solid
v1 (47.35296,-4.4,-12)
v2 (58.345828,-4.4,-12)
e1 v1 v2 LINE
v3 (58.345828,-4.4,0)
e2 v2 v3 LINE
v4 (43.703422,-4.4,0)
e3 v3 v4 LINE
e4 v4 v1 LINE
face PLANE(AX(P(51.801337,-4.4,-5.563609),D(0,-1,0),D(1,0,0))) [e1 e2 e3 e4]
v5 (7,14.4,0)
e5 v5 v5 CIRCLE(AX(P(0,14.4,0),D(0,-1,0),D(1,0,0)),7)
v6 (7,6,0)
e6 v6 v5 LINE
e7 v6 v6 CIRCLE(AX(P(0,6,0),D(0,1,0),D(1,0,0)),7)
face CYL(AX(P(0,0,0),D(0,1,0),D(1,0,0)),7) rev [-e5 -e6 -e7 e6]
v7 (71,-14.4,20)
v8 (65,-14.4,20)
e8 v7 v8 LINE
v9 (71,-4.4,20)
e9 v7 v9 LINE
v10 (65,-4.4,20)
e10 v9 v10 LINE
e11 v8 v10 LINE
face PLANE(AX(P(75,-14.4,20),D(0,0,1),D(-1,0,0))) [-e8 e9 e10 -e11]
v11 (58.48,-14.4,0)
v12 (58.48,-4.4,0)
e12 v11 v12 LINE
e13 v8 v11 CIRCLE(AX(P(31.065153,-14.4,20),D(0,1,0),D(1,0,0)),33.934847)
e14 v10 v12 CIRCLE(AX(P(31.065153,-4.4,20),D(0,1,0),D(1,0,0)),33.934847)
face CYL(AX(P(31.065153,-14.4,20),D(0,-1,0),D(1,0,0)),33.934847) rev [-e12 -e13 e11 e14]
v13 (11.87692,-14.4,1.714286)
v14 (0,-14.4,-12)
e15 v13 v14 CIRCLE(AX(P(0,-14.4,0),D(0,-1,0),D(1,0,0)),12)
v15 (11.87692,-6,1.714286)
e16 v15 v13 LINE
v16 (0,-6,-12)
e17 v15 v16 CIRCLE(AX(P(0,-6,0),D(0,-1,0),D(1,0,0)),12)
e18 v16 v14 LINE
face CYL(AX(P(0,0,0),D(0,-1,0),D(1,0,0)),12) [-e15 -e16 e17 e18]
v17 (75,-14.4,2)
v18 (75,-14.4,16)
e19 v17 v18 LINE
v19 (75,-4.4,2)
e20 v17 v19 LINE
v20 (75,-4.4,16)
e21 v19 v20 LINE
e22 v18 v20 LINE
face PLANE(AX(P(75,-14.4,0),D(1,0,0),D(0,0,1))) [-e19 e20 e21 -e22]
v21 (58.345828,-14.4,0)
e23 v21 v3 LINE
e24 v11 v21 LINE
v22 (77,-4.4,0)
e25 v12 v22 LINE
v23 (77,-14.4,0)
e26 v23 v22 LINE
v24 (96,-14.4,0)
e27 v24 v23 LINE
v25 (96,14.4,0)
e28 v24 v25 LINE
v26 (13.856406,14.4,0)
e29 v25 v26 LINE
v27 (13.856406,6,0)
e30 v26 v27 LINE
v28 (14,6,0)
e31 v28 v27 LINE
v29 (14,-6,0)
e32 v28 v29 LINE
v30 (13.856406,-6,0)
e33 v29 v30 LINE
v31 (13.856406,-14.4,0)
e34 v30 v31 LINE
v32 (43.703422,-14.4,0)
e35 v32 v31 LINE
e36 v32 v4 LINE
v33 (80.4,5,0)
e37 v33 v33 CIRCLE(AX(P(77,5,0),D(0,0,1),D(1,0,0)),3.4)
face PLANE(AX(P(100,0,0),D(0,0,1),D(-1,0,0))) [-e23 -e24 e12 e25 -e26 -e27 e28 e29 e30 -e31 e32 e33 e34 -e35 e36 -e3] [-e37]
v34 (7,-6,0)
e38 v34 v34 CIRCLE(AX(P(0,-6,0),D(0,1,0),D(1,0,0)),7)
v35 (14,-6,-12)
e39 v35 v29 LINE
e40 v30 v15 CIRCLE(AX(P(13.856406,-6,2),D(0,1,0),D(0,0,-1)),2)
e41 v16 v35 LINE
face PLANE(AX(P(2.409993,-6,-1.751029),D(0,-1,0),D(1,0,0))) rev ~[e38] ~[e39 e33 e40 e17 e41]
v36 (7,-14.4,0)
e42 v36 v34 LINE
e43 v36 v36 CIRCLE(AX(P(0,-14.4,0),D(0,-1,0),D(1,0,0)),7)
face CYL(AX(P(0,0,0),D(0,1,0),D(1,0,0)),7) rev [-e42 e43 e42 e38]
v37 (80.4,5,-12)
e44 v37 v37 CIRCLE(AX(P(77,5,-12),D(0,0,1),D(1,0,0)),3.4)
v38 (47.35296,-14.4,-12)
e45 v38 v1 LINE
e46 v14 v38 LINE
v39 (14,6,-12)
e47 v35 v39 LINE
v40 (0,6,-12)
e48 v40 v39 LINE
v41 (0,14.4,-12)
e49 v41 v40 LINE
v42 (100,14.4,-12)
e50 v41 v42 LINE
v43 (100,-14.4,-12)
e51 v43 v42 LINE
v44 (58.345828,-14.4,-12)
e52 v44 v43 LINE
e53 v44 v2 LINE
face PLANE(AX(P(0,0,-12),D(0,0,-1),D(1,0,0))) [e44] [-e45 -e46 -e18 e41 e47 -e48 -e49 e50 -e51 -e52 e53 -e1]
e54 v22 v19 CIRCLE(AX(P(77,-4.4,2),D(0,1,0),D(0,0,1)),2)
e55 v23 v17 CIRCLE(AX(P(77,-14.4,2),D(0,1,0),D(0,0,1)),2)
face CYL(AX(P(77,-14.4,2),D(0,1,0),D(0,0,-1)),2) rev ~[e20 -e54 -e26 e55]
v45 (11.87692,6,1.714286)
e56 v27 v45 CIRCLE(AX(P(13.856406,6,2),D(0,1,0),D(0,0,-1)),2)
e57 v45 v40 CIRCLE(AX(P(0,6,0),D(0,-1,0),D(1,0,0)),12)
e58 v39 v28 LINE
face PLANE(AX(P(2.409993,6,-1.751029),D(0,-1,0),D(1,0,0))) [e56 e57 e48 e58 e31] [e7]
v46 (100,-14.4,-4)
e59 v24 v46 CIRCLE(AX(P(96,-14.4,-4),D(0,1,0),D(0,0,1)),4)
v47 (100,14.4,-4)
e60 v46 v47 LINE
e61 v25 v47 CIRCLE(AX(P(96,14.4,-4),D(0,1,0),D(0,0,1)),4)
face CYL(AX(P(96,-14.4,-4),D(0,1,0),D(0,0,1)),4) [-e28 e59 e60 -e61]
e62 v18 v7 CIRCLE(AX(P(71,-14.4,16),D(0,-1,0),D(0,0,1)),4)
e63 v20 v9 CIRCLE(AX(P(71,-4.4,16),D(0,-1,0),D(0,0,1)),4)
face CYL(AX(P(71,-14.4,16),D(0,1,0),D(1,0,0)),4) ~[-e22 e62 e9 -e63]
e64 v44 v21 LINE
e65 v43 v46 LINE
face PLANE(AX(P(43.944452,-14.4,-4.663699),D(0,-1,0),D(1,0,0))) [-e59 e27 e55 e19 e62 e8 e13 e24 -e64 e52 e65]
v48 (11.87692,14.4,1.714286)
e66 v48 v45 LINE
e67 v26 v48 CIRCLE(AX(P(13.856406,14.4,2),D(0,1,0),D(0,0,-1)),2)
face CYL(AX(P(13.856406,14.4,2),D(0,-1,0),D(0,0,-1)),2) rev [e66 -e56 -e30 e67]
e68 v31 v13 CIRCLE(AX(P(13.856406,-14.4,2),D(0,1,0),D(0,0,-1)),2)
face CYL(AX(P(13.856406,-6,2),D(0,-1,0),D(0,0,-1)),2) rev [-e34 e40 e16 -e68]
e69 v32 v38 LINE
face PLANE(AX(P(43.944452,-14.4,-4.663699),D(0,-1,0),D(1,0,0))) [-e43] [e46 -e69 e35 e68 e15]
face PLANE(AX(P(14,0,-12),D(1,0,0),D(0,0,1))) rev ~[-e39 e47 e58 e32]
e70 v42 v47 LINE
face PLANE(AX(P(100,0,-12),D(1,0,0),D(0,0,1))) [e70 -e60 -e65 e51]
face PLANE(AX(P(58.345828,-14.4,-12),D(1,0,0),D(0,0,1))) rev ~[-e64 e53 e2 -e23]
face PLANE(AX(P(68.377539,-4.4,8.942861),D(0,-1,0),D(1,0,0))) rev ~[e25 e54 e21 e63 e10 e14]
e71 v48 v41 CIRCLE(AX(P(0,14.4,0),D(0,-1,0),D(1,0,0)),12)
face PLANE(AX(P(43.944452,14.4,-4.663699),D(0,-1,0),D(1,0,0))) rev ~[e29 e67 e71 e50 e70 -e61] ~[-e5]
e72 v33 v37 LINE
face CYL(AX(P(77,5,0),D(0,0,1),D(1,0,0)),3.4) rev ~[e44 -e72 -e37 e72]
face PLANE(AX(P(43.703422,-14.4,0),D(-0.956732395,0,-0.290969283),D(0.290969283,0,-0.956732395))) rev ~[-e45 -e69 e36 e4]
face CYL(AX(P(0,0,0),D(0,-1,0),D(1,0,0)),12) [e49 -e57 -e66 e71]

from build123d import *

# Parameters (mm, degrees)
F0_R      = 7
F1_DEPTH  = 14.4
F4_DEPTH  = 10
F7_DEPTH  = 10
F8_DEPTH  = 6
F9_R      = 3.4
F10_DEPTH = 25
F11_R     = 4
F12_R     = 2


with BuildPart() as f1:
    # F0 (on Front) → F1 (new body, symmetric)
    with BuildSketch(Plane.XZ):
        with BuildLine():
            Line((100, 0), (12, 0))
            ThreePointArc((12, 0), (-8.4852813742, 8.4852813742), (0, -12))
            Line((0, -12), (100, -12))
            Line((100, -12), (100, 0))
        make_face()
        Circle(F0_R, mode=Mode.SUBTRACT)
    extrude(amount=F1_DEPTH, both=True)

    # F3 (on face) → F4 (join)
    with BuildSketch(Plane.XZ.offset(14.4)):
        with BuildLine():
            Line((65, 0), (75, 0))
            Line((75, 0), (75, 20))
            Line((75, 20), (65, 20))
            ThreePointArc((65, 20), (63.3288514808, 9.4820344172), (58.48, 0))
            Line((58.48, 0), (65, 0))
        make_face()
    extrude(amount=-F4_DEPTH)

    # F6 (on face) → F7 (cut)
    with BuildSketch(Plane.XZ.offset(14.4)):
        Polygon((58.3458282053, -12), (58.3458282053, 0), (43.7034219503, 0), (47.3529601204, -12), align=None)
    extrude(amount=-F7_DEPTH, mode=Mode.SUBTRACT)

    # F2 (on Front) → F8 (cut, symmetric)
    with BuildSketch(Plane.XZ):
        with BuildLine():
            Line((14, -12), (14, 0))
            Line((14, 0), (12, 0))
            ThreePointArc((12, 0), (-8.4852813742, 8.4852813742), (0, -12))
            Line((0, -12), (14, -12))
        make_face()
    extrude(amount=F8_DEPTH, both=True, mode=Mode.SUBTRACT)

    # F9 (on face) → F10 (cut)
    with BuildSketch(Plane.XY):
        with Locations((77, 5)):
            Circle(F9_R)
    extrude(amount=-F10_DEPTH, mode=Mode.SUBTRACT)

    # F11
    f11_edges = [f1.edges().sort_by_distance(p)[0] for p in [
        (100, 0, 0),
        (75, -9.4, 20),
    ]]
    fillet(f11_edges, radius=F11_R)

    # F12
    f12_edges = [f1.edges().sort_by_distance(p)[0] for p in [
        (75, -9.4, 0),
        (12, 10.2, 0),
        (12, -10.2, 0),
    ]]
    fillet(f12_edges, radius=F12_R)


solid = f1.part
